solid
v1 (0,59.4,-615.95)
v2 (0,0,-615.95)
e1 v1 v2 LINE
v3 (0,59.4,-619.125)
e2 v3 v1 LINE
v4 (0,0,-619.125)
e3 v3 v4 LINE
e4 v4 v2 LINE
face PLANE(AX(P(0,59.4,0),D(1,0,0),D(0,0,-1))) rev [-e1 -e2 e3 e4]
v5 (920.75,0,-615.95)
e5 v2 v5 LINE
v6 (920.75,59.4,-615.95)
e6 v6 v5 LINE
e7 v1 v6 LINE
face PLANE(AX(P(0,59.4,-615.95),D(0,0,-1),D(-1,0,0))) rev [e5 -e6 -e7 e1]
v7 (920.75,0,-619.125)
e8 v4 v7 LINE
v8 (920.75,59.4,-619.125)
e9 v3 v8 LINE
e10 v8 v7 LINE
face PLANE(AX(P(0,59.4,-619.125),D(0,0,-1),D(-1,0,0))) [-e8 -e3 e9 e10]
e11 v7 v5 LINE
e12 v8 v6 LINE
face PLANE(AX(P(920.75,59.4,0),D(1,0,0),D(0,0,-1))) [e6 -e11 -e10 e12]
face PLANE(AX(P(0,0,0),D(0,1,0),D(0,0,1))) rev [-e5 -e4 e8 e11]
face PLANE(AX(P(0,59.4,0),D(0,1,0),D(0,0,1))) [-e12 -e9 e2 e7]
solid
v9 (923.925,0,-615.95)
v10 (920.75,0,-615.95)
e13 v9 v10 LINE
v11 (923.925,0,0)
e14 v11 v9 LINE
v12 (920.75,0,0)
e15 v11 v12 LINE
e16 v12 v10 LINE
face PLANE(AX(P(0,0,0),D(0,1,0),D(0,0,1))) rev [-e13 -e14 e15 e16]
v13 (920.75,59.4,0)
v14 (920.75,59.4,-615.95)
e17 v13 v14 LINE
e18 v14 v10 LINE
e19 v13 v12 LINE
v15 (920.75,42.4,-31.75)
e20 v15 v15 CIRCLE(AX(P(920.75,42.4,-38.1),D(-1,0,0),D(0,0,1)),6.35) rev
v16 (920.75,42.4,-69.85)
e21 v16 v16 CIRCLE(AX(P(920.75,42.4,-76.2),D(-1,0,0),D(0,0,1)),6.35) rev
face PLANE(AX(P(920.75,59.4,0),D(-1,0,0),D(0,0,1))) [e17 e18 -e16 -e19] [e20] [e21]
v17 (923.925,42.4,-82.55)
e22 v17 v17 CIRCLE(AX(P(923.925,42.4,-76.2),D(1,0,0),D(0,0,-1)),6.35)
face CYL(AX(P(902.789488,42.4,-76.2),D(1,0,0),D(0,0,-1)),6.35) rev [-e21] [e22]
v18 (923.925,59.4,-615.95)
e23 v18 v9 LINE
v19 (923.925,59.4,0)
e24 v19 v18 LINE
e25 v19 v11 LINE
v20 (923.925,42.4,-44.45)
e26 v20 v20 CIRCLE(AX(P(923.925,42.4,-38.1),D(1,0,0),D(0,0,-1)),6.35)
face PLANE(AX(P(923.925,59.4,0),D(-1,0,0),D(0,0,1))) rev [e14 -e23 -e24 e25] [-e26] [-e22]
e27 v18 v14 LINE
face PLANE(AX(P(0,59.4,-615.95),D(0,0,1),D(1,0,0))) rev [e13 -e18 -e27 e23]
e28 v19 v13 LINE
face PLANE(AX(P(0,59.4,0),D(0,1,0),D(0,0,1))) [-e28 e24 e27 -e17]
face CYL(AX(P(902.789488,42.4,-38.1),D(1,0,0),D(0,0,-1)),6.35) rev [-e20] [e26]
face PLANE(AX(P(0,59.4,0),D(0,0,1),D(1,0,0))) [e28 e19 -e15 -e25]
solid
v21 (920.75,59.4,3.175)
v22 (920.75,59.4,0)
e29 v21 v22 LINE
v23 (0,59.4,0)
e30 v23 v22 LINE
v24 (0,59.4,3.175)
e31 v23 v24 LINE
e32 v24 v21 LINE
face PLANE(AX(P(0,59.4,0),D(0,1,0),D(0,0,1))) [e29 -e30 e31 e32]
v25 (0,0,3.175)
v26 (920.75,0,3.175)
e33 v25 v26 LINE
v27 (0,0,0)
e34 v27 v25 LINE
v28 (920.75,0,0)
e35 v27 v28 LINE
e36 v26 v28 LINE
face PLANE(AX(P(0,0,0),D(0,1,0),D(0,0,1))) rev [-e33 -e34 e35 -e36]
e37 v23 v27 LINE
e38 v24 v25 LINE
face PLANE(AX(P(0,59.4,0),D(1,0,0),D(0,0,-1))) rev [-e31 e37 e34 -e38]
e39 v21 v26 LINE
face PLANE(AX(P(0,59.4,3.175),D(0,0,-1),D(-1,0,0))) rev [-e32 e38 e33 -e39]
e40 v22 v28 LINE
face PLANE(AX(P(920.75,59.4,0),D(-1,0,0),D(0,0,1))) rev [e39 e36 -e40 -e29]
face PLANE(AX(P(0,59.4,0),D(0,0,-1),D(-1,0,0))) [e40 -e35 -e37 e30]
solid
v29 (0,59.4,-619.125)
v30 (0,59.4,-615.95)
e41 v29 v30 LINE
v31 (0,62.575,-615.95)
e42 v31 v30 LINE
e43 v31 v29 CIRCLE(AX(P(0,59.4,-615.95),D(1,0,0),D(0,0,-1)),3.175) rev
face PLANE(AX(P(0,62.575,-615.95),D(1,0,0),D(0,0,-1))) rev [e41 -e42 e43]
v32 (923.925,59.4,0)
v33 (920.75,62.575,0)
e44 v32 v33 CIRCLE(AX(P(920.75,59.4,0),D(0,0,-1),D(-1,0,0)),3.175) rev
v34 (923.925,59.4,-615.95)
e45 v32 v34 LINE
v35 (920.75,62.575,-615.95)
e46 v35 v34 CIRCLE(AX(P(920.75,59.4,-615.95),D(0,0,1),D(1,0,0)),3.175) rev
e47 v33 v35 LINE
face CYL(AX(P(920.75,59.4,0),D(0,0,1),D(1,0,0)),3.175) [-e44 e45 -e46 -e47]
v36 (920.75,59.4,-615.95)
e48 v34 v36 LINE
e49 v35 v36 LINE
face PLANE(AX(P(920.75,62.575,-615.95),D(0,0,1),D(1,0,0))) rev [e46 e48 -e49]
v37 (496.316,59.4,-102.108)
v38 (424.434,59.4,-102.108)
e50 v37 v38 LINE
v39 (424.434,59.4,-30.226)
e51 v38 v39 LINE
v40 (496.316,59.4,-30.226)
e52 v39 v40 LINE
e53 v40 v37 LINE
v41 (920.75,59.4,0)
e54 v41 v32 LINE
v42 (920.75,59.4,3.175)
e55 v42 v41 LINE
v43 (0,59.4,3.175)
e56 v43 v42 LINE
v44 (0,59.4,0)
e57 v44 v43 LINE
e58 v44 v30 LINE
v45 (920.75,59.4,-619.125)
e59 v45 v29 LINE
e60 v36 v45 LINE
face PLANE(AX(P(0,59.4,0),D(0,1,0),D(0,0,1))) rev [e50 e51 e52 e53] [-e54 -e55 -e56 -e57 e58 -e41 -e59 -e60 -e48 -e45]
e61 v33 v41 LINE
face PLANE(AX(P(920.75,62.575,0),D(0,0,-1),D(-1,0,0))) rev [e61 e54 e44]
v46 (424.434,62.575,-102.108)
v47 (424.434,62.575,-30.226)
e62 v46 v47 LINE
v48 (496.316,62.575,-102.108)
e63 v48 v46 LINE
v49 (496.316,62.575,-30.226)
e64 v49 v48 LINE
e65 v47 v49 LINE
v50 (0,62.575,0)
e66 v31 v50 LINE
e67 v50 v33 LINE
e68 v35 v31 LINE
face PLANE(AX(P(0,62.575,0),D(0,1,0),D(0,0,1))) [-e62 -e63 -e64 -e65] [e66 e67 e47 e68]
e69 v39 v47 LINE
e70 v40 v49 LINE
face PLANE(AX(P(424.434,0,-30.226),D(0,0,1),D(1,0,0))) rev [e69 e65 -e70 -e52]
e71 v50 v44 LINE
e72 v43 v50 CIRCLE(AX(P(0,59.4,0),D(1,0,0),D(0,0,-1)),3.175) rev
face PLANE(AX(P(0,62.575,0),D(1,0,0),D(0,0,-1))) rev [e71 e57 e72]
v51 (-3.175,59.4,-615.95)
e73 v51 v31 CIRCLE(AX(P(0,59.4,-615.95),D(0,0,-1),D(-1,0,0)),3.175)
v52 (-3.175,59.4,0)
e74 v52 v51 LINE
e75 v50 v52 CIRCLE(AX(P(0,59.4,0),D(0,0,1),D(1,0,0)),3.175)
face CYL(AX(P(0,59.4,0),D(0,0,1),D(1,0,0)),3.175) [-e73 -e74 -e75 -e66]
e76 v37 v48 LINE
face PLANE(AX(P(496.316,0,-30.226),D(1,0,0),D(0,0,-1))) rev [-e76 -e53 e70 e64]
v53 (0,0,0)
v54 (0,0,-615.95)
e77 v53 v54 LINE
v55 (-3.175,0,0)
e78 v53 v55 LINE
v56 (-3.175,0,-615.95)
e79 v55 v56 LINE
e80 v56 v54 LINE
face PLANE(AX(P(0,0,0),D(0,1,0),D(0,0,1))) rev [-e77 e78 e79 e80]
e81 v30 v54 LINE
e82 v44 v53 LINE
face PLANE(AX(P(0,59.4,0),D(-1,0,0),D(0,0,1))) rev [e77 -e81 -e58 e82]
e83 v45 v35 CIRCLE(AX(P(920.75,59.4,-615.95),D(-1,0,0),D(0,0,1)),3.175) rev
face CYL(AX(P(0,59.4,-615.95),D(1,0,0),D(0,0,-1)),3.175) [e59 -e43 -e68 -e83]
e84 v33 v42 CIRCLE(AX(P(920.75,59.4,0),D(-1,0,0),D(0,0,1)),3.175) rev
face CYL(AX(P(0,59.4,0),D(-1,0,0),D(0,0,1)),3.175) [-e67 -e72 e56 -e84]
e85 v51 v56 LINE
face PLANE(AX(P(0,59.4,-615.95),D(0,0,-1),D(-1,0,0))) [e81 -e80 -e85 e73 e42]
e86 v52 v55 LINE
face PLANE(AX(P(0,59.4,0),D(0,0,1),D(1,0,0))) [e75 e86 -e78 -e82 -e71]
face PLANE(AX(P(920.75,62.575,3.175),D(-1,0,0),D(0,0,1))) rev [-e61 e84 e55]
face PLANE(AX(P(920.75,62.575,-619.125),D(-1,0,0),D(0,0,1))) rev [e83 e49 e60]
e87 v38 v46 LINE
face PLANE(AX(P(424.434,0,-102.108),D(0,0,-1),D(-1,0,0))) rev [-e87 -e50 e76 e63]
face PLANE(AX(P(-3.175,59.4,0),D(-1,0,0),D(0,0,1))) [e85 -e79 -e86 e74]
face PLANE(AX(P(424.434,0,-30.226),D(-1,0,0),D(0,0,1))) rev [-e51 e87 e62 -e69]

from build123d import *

# Parameters (mm, degrees)
SKETCH1_W                 = 3.175
SKETCH1_H                 = 615.95
SKIRT_DEPTH               = 59.4
SKETCH1_W_2               = 920.75
SKETCH1_H_2               = 3.175
SKIRT_2_DEPTH             = 59.4
SKIRT_3_DEPTH             = 59.4
SKIRT_4_DEPTH             = 59.4
TOP_SURFACE_DEPTH         = 3.175
FILLET1_R                 = 3.175
SCALE_HOLE_DEPTH          = 1114.942907817
SCALE_HOLE_DEPTH_BACK     = 1114.942907817
SKETCH3_W                 = 71.882
SKETCH3_H                 = 71.882
SKETCH4_R                 = 6.35
TETHER_AND_AIR_HOLE_DEPTH = 3.175


with BuildPart() as part:
    # Sketch1 → Skirt (new body)
    with BuildSketch(Plane(origin=(0, 0, 0), x_dir=(1, 0, 0), z_dir=(0, 1, 0))):
        with Locations((-1.5875, 307.975)):
            Rectangle(SKETCH1_W, SKETCH1_H)
    extrude(amount=SKIRT_DEPTH)

    # Sketch2 → Top Surface (add)
    with BuildSketch(Plane(origin=(0, 59.4, 0), x_dir=(1, 0, 0), z_dir=(0, 1, 0))):
        Polygon((-3.175, 0), (0, 0), (0, -3.175), (920.75, -3.175), (920.75, 0), (923.925, 0), (923.925, 615.95), (920.75, 615.95), (920.75, 619.125), (0, 619.125), (0, 615.95), (-3.175, 615.95), align=None)
    extrude(amount=TOP_SURFACE_DEPTH)

    # Fillet1
    fillet1_edges = [part.edges().sort_by_distance(p)[0] for p in [
        (923.925, 62.575, -307.975),
        (460.375, 62.575, -619.125),
        (460.375, 62.575, 3.175),
        (-3.175, 62.575, -307.975),
    ]]
    fillet(fillet1_edges, radius=FILLET1_R - 0.0001)  # a hair under: the kernel refuses the full size

    # Sketch3 → Scale Hole (cut, two sides: drawn at the far end of the back side and taken through both)
    with BuildSketch(Plane(origin=(0, 62.575, 0), x_dir=(1, 0, 0), z_dir=(0, 1, 0)).offset(-SCALE_HOLE_DEPTH_BACK)):
        with Locations((460.375, 66.167)):
            Rectangle(SKETCH3_W, SKETCH3_H)
    extrude(amount=SCALE_HOLE_DEPTH + SCALE_HOLE_DEPTH_BACK, mode=Mode.SUBTRACT)


with BuildPart() as body_2:
    # Sketch1 → Skirt 2 (new body)
    with BuildSketch(Plane(origin=(0, 0, 0), x_dir=(1, 0, 0), z_dir=(0, 1, 0))):
        with Locations((460.375, -1.5875)):
            Rectangle(SKETCH1_W_2, SKETCH1_H_2)
    extrude(amount=SKIRT_2_DEPTH)


with BuildPart() as body_3:
    # Sketch1 → Skirt 3 (new body)
    with BuildSketch(Plane(origin=(0, 0, 0), x_dir=(1, 0, 0), z_dir=(0, 1, 0))):
        with Locations((460.375, 617.5375)):
            Rectangle(SKETCH1_W_2, SKETCH1_H_2)
    extrude(amount=SKIRT_3_DEPTH)


with BuildPart() as body_4:
    # Sketch1 → Skirt 4 (new body)
    with BuildSketch(Plane(origin=(0, 0, 0), x_dir=(1, 0, 0), z_dir=(0, 1, 0))):
        with Locations((922.3375, 307.975)):
            Rectangle(SKETCH1_W, SKETCH1_H)
    extrude(amount=SKIRT_4_DEPTH)

    # Sketch4 → Tether and Air Hole (cut)
    with BuildSketch(Plane(origin=(923.925, 0, 0), x_dir=(0, 0, -1), z_dir=(1, 0, 0))):
        with Locations((38.1, 42.4)):
            Circle(SKETCH4_R)
        with Locations((76.2, 42.4)):
            Circle(SKETCH4_R)
    extrude(amount=-TETHER_AND_AIR_HOLE_DEPTH, mode=Mode.SUBTRACT)


solid = Compound([part.part, body_2.part, body_3.part, body_4.part])
